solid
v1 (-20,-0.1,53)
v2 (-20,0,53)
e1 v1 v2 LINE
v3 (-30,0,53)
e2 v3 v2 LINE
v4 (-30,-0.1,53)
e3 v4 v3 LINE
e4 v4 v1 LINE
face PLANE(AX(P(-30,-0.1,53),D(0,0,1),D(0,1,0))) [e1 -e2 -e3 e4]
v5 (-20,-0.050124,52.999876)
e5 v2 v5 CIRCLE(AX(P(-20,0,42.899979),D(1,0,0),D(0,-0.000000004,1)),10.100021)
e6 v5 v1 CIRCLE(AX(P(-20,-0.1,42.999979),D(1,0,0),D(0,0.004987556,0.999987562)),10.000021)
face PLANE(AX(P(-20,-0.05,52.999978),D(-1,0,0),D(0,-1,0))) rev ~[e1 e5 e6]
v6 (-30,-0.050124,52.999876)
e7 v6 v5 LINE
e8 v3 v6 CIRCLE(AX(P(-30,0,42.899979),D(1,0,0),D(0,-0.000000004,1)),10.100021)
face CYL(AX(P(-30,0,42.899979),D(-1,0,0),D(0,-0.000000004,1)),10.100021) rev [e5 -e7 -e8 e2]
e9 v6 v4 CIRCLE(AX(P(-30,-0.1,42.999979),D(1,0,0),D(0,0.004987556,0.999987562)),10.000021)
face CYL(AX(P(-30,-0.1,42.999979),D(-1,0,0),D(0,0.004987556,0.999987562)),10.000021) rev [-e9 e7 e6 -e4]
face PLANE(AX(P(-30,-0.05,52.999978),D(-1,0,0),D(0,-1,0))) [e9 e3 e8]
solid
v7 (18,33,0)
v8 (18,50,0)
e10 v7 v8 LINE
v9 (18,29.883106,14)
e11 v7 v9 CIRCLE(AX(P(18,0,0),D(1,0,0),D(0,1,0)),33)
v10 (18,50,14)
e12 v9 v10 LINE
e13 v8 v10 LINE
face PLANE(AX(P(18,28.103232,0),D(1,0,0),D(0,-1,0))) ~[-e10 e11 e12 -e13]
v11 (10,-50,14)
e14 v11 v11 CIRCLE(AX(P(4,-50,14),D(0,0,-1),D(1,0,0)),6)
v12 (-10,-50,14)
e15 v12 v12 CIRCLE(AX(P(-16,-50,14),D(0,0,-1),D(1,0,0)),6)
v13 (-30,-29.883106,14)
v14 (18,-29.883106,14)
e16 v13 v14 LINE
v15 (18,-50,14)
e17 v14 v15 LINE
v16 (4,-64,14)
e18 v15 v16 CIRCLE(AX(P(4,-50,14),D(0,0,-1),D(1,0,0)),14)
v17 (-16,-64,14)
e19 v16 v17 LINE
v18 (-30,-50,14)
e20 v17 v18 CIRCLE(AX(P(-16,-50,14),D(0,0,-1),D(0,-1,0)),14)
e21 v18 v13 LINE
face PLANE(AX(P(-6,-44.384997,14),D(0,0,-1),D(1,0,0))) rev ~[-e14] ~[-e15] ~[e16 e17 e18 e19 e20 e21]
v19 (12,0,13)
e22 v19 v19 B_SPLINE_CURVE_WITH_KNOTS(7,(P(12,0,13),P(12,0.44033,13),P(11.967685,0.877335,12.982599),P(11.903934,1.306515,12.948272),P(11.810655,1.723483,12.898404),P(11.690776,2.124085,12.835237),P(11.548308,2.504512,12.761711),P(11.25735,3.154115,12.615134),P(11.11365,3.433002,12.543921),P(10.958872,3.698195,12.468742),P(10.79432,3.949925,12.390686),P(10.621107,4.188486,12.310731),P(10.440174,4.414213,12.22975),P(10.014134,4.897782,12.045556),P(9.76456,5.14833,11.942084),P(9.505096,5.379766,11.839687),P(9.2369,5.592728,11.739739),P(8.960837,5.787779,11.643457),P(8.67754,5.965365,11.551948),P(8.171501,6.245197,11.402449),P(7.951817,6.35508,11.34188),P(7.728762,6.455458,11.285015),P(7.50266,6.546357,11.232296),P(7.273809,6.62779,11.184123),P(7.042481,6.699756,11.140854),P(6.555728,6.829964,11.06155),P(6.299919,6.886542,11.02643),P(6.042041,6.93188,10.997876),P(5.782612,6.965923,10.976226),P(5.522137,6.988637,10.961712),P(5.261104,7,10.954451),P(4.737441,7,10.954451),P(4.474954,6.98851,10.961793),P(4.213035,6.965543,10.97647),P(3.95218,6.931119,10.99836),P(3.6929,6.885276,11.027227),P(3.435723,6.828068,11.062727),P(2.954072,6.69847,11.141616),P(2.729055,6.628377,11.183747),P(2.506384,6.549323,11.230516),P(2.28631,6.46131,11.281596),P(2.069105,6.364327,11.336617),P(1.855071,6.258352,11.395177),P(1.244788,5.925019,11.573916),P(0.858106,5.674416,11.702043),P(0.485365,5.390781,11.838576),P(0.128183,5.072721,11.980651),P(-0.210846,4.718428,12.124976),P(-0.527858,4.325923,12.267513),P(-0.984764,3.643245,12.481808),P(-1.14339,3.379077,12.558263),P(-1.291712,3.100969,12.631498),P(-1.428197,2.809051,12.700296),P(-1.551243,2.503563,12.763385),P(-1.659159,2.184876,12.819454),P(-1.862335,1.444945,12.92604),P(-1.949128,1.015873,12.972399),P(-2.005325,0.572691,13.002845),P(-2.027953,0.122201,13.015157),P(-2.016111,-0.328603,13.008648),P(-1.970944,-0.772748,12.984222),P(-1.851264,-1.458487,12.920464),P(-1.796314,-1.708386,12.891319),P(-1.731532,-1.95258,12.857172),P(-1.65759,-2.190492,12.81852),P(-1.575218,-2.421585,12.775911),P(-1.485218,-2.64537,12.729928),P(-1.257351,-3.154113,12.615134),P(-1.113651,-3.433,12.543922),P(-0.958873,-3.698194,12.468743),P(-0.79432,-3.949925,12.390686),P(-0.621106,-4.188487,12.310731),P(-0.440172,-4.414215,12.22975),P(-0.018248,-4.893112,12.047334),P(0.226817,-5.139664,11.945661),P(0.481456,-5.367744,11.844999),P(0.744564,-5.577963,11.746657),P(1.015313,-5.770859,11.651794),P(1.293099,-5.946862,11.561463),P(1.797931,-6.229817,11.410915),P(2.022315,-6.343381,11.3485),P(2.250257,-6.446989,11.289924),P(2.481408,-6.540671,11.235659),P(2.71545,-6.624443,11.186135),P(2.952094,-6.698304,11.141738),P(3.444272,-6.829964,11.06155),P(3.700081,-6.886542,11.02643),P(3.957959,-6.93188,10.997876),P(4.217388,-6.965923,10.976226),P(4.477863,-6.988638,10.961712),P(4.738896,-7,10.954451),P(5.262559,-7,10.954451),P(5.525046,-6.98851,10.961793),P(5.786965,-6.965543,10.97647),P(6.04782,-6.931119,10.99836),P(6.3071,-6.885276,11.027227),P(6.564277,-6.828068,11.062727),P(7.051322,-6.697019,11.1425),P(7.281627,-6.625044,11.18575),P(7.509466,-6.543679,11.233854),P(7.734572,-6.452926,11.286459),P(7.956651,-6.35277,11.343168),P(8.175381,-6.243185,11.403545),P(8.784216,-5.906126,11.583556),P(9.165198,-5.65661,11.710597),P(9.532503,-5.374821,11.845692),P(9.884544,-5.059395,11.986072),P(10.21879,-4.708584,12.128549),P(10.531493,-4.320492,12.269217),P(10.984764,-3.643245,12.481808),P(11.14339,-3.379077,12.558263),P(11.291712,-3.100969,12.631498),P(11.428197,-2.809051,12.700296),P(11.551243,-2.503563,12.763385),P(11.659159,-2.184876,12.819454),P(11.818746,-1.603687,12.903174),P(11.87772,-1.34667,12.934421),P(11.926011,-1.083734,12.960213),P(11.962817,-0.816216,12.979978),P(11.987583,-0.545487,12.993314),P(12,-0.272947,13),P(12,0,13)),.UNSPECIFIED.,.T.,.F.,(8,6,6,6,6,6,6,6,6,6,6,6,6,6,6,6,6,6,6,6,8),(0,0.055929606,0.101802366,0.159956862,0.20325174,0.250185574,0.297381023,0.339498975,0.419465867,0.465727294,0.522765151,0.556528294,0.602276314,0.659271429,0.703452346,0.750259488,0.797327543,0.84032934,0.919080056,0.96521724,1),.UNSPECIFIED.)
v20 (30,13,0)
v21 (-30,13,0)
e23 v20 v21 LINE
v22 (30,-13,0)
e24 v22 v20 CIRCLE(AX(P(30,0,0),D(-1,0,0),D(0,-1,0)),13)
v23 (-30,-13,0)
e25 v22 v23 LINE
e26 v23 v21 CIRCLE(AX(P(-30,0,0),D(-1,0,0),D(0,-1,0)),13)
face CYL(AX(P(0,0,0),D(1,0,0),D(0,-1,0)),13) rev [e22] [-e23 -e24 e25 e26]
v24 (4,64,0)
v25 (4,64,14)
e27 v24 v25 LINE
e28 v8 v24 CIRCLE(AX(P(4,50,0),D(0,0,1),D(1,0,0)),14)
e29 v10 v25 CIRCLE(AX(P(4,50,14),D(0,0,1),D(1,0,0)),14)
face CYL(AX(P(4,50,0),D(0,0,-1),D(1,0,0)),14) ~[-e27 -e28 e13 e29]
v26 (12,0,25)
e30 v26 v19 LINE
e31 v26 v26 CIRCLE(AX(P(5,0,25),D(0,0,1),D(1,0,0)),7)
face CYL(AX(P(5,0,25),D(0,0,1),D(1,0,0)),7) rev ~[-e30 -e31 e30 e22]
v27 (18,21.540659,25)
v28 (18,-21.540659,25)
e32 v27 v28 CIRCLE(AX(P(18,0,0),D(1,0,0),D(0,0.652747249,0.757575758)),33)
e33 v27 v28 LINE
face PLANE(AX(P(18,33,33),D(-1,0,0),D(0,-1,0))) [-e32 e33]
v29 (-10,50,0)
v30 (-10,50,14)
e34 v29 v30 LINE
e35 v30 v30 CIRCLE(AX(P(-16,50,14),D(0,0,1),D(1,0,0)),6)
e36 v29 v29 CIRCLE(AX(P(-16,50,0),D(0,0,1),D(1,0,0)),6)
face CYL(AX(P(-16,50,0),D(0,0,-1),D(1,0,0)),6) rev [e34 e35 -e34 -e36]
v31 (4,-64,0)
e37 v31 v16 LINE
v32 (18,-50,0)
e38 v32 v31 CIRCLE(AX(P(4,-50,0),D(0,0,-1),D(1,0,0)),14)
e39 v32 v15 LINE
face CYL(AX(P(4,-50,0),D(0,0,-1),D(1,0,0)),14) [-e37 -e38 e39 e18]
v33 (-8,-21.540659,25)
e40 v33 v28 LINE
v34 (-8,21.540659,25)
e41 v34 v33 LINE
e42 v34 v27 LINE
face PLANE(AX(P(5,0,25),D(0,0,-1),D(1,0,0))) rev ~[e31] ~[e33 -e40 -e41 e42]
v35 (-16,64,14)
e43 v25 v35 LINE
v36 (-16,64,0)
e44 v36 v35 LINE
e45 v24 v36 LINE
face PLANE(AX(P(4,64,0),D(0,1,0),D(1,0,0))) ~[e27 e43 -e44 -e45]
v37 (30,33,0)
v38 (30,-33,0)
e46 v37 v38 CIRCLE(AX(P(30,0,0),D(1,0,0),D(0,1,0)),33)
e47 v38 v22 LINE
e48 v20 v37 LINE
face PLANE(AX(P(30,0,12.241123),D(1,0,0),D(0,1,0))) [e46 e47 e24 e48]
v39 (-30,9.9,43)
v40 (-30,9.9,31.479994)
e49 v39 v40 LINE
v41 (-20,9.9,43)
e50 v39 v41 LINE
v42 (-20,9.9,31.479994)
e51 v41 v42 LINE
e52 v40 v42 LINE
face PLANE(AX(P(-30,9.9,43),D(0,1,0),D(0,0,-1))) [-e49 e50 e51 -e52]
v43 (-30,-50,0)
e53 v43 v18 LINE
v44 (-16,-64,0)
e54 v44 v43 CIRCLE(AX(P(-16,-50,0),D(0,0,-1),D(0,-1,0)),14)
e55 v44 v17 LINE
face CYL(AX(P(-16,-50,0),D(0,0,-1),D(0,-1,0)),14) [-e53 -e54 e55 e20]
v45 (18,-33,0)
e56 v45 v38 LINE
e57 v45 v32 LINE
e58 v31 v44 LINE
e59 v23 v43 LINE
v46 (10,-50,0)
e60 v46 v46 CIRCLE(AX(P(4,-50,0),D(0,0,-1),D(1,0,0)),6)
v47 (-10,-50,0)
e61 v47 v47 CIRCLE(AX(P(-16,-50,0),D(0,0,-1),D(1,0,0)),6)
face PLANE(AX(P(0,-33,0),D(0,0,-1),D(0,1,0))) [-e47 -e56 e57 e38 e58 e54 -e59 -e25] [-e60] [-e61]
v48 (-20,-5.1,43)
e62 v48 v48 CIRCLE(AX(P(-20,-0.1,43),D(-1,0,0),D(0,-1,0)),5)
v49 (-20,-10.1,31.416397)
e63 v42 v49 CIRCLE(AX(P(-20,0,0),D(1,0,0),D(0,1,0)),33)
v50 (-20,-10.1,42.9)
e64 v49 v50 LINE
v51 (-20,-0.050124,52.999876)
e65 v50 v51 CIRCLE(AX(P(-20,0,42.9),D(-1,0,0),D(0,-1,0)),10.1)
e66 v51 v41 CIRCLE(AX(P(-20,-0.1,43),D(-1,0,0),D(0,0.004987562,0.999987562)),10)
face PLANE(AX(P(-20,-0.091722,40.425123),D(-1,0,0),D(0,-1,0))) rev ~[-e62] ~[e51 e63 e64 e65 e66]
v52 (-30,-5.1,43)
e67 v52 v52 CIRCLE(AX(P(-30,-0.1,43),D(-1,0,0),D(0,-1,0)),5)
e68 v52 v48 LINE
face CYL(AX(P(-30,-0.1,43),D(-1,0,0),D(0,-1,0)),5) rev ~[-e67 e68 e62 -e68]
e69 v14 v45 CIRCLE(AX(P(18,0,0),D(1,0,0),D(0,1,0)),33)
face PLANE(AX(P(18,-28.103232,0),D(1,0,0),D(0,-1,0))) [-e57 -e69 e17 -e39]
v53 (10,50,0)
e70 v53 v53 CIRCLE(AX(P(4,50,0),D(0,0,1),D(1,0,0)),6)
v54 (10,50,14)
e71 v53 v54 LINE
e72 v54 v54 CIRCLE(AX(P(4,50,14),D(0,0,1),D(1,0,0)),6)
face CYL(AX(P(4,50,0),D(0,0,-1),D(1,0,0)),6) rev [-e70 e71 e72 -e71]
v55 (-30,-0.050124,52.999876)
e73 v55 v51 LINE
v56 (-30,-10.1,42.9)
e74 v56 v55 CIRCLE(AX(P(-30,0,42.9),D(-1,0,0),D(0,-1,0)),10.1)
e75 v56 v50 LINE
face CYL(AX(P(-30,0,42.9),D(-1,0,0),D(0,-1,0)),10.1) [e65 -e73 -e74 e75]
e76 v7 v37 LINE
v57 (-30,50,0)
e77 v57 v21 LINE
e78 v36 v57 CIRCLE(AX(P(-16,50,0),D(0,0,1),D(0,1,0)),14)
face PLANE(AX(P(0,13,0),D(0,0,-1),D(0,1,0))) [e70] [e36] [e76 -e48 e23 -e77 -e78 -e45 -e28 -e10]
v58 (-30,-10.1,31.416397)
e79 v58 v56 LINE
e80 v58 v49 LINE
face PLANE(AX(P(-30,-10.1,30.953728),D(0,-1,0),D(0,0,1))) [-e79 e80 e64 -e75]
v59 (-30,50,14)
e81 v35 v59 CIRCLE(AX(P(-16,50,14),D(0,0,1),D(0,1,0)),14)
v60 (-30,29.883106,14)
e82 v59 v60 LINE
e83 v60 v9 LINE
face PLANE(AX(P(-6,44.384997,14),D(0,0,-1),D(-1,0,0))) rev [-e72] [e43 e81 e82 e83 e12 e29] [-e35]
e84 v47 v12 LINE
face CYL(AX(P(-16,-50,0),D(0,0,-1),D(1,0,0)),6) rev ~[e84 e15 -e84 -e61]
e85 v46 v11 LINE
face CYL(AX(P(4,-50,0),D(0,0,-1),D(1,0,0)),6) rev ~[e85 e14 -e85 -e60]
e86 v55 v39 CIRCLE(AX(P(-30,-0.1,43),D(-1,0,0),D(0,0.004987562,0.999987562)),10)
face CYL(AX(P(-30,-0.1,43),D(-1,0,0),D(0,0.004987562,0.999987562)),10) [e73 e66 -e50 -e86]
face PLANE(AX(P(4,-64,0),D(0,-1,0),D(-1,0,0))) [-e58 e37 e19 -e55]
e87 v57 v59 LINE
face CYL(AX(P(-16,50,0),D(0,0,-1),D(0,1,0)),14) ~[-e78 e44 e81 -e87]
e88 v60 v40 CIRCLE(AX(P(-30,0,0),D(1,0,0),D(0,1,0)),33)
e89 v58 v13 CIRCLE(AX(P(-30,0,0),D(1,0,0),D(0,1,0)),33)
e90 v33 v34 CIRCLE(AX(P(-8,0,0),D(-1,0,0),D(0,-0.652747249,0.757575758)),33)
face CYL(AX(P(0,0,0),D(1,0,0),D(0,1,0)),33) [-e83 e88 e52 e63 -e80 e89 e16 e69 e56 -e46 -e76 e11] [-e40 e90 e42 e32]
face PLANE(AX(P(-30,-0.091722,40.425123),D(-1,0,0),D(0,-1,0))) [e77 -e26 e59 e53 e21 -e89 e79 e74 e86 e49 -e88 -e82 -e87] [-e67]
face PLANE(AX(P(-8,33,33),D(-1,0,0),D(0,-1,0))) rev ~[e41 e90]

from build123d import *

# Parameters (mm, degrees)
F1_DEPTH  = 30
F2_R      = 6
F3_DEPTH  = 14
F4_R      = 5
F5_DEPTH  = 10
F7_W      = 26
F7_H      = 66
F8_DEPTH  = 8
F9_R      = 7
F10_DEPTH = 25.001


# Not quite as in the source:
# - a pattern or mirror of a feature is missing from the dataset's text; its kind, count and spacing are read off the source's solid


with BuildPart() as f1:
    # F0 (on Right) → F1 (new body, symmetric)
    with BuildSketch(Plane.YZ):
        with BuildLine():
            Line((13, 0), (33, 0))
            ThreePointArc((33, 0), (0, 33), (-33, 0))
            Line((-33, 0), (-13, 0))
            ThreePointArc((-13, 0), (0, 13), (13, 0))
        make_face()
    extrude(amount=F1_DEPTH, both=True)

    # F2 (on face) → F3 (join)
    with BuildSketch(Plane(origin=(0, 0, 0), x_dir=(1, 0, 0), z_dir=(0, 0, -1))):
        with BuildLine():
            Line((18, 28.1032323837), (18, 33))
            Line((18, 33), (18, 50))
            ThreePointArc((18, 50), (13.8994949366, 59.8994949366), (4, 64))
            Line((4, 64), (-16, 64))
            ThreePointArc((-16, 64), (-25.8994949366, 59.8994949366), (-30, 50))
            Line((-30, 50), (-30, 33))
            Line((-30, 33), (-30, 28.1032323837))
            Line((-30, 28.1032323837), (18, 28.1032323837))
        make_face()
        with Locations((-16, 50)):
            Circle(F2_R, mode=Mode.SUBTRACT)
        with Locations((4, 50)):
            Circle(F2_R, mode=Mode.SUBTRACT)
    f3 = extrude(amount=-F3_DEPTH)

    # F3_copies: F3 across plane
    add(f3.mirror(Plane.ZX))

    # F4 (on face) → F5 (join)
    with BuildSketch(Plane(origin=(-30, 0, 0), x_dir=(0, -1, 0), z_dir=(-1, 0, 0))):
        with BuildLine():
            ThreePointArc((10.1, 42.9), (7.1594782015, 50.0240348036), (0.0501243796, 52.9998756204))
            ThreePointArc((0.0501243796, 52.9998756204), (-6.9886795739, 50.0534120749), (-9.9, 43))
            Line((-9.9, 43), (-9.9, 30.9537276626))
            Line((-9.9, 30.9537276626), (10.1, 30.9537276626))
            Line((10.1, 30.9537276626), (10.1, 42.9))
        make_face()
        with Locations((0.1, 43)):
            Circle(F4_R, mode=Mode.SUBTRACT)
    extrude(amount=-F5_DEPTH)

    # F7 (on offset) → F8 (cut)
    with BuildSketch(Plane(origin=(0, 0, 33), x_dir=(1, 0, 0), z_dir=(0, 0, -1))):
        with Locations((5, 0)):
            Rectangle(F7_W, F7_H)
    extrude(amount=F8_DEPTH, mode=Mode.SUBTRACT)

    # F9 (on face) → F10 (cut, through all)
    with BuildSketch(Plane.XY.offset(25)):
        with Locations((5, 0)):
            Circle(F9_R)
    extrude(amount=-F10_DEPTH, mode=Mode.SUBTRACT)


with BuildPart() as f5:
    # F4 (on face) → F5, piece 2 (new body)
    with BuildSketch(Plane(origin=(-30, 0, 0), x_dir=(0, -1, 0), z_dir=(-1, 0, 0))):
        with BuildLine():
            Line((0.1, 53), (0, 53))
            ThreePointArc((0, 53), (0.025062267, 52.999968905), (0.0501243796, 52.9998756204))
            ThreePointArc((0.0501243796, 52.9998756204), (0.0750621123, 52.999968905), (0.1, 53))
        make_face()
    extrude(amount=-F5_DEPTH)


solid = Compound([f1.part, f5.part])
